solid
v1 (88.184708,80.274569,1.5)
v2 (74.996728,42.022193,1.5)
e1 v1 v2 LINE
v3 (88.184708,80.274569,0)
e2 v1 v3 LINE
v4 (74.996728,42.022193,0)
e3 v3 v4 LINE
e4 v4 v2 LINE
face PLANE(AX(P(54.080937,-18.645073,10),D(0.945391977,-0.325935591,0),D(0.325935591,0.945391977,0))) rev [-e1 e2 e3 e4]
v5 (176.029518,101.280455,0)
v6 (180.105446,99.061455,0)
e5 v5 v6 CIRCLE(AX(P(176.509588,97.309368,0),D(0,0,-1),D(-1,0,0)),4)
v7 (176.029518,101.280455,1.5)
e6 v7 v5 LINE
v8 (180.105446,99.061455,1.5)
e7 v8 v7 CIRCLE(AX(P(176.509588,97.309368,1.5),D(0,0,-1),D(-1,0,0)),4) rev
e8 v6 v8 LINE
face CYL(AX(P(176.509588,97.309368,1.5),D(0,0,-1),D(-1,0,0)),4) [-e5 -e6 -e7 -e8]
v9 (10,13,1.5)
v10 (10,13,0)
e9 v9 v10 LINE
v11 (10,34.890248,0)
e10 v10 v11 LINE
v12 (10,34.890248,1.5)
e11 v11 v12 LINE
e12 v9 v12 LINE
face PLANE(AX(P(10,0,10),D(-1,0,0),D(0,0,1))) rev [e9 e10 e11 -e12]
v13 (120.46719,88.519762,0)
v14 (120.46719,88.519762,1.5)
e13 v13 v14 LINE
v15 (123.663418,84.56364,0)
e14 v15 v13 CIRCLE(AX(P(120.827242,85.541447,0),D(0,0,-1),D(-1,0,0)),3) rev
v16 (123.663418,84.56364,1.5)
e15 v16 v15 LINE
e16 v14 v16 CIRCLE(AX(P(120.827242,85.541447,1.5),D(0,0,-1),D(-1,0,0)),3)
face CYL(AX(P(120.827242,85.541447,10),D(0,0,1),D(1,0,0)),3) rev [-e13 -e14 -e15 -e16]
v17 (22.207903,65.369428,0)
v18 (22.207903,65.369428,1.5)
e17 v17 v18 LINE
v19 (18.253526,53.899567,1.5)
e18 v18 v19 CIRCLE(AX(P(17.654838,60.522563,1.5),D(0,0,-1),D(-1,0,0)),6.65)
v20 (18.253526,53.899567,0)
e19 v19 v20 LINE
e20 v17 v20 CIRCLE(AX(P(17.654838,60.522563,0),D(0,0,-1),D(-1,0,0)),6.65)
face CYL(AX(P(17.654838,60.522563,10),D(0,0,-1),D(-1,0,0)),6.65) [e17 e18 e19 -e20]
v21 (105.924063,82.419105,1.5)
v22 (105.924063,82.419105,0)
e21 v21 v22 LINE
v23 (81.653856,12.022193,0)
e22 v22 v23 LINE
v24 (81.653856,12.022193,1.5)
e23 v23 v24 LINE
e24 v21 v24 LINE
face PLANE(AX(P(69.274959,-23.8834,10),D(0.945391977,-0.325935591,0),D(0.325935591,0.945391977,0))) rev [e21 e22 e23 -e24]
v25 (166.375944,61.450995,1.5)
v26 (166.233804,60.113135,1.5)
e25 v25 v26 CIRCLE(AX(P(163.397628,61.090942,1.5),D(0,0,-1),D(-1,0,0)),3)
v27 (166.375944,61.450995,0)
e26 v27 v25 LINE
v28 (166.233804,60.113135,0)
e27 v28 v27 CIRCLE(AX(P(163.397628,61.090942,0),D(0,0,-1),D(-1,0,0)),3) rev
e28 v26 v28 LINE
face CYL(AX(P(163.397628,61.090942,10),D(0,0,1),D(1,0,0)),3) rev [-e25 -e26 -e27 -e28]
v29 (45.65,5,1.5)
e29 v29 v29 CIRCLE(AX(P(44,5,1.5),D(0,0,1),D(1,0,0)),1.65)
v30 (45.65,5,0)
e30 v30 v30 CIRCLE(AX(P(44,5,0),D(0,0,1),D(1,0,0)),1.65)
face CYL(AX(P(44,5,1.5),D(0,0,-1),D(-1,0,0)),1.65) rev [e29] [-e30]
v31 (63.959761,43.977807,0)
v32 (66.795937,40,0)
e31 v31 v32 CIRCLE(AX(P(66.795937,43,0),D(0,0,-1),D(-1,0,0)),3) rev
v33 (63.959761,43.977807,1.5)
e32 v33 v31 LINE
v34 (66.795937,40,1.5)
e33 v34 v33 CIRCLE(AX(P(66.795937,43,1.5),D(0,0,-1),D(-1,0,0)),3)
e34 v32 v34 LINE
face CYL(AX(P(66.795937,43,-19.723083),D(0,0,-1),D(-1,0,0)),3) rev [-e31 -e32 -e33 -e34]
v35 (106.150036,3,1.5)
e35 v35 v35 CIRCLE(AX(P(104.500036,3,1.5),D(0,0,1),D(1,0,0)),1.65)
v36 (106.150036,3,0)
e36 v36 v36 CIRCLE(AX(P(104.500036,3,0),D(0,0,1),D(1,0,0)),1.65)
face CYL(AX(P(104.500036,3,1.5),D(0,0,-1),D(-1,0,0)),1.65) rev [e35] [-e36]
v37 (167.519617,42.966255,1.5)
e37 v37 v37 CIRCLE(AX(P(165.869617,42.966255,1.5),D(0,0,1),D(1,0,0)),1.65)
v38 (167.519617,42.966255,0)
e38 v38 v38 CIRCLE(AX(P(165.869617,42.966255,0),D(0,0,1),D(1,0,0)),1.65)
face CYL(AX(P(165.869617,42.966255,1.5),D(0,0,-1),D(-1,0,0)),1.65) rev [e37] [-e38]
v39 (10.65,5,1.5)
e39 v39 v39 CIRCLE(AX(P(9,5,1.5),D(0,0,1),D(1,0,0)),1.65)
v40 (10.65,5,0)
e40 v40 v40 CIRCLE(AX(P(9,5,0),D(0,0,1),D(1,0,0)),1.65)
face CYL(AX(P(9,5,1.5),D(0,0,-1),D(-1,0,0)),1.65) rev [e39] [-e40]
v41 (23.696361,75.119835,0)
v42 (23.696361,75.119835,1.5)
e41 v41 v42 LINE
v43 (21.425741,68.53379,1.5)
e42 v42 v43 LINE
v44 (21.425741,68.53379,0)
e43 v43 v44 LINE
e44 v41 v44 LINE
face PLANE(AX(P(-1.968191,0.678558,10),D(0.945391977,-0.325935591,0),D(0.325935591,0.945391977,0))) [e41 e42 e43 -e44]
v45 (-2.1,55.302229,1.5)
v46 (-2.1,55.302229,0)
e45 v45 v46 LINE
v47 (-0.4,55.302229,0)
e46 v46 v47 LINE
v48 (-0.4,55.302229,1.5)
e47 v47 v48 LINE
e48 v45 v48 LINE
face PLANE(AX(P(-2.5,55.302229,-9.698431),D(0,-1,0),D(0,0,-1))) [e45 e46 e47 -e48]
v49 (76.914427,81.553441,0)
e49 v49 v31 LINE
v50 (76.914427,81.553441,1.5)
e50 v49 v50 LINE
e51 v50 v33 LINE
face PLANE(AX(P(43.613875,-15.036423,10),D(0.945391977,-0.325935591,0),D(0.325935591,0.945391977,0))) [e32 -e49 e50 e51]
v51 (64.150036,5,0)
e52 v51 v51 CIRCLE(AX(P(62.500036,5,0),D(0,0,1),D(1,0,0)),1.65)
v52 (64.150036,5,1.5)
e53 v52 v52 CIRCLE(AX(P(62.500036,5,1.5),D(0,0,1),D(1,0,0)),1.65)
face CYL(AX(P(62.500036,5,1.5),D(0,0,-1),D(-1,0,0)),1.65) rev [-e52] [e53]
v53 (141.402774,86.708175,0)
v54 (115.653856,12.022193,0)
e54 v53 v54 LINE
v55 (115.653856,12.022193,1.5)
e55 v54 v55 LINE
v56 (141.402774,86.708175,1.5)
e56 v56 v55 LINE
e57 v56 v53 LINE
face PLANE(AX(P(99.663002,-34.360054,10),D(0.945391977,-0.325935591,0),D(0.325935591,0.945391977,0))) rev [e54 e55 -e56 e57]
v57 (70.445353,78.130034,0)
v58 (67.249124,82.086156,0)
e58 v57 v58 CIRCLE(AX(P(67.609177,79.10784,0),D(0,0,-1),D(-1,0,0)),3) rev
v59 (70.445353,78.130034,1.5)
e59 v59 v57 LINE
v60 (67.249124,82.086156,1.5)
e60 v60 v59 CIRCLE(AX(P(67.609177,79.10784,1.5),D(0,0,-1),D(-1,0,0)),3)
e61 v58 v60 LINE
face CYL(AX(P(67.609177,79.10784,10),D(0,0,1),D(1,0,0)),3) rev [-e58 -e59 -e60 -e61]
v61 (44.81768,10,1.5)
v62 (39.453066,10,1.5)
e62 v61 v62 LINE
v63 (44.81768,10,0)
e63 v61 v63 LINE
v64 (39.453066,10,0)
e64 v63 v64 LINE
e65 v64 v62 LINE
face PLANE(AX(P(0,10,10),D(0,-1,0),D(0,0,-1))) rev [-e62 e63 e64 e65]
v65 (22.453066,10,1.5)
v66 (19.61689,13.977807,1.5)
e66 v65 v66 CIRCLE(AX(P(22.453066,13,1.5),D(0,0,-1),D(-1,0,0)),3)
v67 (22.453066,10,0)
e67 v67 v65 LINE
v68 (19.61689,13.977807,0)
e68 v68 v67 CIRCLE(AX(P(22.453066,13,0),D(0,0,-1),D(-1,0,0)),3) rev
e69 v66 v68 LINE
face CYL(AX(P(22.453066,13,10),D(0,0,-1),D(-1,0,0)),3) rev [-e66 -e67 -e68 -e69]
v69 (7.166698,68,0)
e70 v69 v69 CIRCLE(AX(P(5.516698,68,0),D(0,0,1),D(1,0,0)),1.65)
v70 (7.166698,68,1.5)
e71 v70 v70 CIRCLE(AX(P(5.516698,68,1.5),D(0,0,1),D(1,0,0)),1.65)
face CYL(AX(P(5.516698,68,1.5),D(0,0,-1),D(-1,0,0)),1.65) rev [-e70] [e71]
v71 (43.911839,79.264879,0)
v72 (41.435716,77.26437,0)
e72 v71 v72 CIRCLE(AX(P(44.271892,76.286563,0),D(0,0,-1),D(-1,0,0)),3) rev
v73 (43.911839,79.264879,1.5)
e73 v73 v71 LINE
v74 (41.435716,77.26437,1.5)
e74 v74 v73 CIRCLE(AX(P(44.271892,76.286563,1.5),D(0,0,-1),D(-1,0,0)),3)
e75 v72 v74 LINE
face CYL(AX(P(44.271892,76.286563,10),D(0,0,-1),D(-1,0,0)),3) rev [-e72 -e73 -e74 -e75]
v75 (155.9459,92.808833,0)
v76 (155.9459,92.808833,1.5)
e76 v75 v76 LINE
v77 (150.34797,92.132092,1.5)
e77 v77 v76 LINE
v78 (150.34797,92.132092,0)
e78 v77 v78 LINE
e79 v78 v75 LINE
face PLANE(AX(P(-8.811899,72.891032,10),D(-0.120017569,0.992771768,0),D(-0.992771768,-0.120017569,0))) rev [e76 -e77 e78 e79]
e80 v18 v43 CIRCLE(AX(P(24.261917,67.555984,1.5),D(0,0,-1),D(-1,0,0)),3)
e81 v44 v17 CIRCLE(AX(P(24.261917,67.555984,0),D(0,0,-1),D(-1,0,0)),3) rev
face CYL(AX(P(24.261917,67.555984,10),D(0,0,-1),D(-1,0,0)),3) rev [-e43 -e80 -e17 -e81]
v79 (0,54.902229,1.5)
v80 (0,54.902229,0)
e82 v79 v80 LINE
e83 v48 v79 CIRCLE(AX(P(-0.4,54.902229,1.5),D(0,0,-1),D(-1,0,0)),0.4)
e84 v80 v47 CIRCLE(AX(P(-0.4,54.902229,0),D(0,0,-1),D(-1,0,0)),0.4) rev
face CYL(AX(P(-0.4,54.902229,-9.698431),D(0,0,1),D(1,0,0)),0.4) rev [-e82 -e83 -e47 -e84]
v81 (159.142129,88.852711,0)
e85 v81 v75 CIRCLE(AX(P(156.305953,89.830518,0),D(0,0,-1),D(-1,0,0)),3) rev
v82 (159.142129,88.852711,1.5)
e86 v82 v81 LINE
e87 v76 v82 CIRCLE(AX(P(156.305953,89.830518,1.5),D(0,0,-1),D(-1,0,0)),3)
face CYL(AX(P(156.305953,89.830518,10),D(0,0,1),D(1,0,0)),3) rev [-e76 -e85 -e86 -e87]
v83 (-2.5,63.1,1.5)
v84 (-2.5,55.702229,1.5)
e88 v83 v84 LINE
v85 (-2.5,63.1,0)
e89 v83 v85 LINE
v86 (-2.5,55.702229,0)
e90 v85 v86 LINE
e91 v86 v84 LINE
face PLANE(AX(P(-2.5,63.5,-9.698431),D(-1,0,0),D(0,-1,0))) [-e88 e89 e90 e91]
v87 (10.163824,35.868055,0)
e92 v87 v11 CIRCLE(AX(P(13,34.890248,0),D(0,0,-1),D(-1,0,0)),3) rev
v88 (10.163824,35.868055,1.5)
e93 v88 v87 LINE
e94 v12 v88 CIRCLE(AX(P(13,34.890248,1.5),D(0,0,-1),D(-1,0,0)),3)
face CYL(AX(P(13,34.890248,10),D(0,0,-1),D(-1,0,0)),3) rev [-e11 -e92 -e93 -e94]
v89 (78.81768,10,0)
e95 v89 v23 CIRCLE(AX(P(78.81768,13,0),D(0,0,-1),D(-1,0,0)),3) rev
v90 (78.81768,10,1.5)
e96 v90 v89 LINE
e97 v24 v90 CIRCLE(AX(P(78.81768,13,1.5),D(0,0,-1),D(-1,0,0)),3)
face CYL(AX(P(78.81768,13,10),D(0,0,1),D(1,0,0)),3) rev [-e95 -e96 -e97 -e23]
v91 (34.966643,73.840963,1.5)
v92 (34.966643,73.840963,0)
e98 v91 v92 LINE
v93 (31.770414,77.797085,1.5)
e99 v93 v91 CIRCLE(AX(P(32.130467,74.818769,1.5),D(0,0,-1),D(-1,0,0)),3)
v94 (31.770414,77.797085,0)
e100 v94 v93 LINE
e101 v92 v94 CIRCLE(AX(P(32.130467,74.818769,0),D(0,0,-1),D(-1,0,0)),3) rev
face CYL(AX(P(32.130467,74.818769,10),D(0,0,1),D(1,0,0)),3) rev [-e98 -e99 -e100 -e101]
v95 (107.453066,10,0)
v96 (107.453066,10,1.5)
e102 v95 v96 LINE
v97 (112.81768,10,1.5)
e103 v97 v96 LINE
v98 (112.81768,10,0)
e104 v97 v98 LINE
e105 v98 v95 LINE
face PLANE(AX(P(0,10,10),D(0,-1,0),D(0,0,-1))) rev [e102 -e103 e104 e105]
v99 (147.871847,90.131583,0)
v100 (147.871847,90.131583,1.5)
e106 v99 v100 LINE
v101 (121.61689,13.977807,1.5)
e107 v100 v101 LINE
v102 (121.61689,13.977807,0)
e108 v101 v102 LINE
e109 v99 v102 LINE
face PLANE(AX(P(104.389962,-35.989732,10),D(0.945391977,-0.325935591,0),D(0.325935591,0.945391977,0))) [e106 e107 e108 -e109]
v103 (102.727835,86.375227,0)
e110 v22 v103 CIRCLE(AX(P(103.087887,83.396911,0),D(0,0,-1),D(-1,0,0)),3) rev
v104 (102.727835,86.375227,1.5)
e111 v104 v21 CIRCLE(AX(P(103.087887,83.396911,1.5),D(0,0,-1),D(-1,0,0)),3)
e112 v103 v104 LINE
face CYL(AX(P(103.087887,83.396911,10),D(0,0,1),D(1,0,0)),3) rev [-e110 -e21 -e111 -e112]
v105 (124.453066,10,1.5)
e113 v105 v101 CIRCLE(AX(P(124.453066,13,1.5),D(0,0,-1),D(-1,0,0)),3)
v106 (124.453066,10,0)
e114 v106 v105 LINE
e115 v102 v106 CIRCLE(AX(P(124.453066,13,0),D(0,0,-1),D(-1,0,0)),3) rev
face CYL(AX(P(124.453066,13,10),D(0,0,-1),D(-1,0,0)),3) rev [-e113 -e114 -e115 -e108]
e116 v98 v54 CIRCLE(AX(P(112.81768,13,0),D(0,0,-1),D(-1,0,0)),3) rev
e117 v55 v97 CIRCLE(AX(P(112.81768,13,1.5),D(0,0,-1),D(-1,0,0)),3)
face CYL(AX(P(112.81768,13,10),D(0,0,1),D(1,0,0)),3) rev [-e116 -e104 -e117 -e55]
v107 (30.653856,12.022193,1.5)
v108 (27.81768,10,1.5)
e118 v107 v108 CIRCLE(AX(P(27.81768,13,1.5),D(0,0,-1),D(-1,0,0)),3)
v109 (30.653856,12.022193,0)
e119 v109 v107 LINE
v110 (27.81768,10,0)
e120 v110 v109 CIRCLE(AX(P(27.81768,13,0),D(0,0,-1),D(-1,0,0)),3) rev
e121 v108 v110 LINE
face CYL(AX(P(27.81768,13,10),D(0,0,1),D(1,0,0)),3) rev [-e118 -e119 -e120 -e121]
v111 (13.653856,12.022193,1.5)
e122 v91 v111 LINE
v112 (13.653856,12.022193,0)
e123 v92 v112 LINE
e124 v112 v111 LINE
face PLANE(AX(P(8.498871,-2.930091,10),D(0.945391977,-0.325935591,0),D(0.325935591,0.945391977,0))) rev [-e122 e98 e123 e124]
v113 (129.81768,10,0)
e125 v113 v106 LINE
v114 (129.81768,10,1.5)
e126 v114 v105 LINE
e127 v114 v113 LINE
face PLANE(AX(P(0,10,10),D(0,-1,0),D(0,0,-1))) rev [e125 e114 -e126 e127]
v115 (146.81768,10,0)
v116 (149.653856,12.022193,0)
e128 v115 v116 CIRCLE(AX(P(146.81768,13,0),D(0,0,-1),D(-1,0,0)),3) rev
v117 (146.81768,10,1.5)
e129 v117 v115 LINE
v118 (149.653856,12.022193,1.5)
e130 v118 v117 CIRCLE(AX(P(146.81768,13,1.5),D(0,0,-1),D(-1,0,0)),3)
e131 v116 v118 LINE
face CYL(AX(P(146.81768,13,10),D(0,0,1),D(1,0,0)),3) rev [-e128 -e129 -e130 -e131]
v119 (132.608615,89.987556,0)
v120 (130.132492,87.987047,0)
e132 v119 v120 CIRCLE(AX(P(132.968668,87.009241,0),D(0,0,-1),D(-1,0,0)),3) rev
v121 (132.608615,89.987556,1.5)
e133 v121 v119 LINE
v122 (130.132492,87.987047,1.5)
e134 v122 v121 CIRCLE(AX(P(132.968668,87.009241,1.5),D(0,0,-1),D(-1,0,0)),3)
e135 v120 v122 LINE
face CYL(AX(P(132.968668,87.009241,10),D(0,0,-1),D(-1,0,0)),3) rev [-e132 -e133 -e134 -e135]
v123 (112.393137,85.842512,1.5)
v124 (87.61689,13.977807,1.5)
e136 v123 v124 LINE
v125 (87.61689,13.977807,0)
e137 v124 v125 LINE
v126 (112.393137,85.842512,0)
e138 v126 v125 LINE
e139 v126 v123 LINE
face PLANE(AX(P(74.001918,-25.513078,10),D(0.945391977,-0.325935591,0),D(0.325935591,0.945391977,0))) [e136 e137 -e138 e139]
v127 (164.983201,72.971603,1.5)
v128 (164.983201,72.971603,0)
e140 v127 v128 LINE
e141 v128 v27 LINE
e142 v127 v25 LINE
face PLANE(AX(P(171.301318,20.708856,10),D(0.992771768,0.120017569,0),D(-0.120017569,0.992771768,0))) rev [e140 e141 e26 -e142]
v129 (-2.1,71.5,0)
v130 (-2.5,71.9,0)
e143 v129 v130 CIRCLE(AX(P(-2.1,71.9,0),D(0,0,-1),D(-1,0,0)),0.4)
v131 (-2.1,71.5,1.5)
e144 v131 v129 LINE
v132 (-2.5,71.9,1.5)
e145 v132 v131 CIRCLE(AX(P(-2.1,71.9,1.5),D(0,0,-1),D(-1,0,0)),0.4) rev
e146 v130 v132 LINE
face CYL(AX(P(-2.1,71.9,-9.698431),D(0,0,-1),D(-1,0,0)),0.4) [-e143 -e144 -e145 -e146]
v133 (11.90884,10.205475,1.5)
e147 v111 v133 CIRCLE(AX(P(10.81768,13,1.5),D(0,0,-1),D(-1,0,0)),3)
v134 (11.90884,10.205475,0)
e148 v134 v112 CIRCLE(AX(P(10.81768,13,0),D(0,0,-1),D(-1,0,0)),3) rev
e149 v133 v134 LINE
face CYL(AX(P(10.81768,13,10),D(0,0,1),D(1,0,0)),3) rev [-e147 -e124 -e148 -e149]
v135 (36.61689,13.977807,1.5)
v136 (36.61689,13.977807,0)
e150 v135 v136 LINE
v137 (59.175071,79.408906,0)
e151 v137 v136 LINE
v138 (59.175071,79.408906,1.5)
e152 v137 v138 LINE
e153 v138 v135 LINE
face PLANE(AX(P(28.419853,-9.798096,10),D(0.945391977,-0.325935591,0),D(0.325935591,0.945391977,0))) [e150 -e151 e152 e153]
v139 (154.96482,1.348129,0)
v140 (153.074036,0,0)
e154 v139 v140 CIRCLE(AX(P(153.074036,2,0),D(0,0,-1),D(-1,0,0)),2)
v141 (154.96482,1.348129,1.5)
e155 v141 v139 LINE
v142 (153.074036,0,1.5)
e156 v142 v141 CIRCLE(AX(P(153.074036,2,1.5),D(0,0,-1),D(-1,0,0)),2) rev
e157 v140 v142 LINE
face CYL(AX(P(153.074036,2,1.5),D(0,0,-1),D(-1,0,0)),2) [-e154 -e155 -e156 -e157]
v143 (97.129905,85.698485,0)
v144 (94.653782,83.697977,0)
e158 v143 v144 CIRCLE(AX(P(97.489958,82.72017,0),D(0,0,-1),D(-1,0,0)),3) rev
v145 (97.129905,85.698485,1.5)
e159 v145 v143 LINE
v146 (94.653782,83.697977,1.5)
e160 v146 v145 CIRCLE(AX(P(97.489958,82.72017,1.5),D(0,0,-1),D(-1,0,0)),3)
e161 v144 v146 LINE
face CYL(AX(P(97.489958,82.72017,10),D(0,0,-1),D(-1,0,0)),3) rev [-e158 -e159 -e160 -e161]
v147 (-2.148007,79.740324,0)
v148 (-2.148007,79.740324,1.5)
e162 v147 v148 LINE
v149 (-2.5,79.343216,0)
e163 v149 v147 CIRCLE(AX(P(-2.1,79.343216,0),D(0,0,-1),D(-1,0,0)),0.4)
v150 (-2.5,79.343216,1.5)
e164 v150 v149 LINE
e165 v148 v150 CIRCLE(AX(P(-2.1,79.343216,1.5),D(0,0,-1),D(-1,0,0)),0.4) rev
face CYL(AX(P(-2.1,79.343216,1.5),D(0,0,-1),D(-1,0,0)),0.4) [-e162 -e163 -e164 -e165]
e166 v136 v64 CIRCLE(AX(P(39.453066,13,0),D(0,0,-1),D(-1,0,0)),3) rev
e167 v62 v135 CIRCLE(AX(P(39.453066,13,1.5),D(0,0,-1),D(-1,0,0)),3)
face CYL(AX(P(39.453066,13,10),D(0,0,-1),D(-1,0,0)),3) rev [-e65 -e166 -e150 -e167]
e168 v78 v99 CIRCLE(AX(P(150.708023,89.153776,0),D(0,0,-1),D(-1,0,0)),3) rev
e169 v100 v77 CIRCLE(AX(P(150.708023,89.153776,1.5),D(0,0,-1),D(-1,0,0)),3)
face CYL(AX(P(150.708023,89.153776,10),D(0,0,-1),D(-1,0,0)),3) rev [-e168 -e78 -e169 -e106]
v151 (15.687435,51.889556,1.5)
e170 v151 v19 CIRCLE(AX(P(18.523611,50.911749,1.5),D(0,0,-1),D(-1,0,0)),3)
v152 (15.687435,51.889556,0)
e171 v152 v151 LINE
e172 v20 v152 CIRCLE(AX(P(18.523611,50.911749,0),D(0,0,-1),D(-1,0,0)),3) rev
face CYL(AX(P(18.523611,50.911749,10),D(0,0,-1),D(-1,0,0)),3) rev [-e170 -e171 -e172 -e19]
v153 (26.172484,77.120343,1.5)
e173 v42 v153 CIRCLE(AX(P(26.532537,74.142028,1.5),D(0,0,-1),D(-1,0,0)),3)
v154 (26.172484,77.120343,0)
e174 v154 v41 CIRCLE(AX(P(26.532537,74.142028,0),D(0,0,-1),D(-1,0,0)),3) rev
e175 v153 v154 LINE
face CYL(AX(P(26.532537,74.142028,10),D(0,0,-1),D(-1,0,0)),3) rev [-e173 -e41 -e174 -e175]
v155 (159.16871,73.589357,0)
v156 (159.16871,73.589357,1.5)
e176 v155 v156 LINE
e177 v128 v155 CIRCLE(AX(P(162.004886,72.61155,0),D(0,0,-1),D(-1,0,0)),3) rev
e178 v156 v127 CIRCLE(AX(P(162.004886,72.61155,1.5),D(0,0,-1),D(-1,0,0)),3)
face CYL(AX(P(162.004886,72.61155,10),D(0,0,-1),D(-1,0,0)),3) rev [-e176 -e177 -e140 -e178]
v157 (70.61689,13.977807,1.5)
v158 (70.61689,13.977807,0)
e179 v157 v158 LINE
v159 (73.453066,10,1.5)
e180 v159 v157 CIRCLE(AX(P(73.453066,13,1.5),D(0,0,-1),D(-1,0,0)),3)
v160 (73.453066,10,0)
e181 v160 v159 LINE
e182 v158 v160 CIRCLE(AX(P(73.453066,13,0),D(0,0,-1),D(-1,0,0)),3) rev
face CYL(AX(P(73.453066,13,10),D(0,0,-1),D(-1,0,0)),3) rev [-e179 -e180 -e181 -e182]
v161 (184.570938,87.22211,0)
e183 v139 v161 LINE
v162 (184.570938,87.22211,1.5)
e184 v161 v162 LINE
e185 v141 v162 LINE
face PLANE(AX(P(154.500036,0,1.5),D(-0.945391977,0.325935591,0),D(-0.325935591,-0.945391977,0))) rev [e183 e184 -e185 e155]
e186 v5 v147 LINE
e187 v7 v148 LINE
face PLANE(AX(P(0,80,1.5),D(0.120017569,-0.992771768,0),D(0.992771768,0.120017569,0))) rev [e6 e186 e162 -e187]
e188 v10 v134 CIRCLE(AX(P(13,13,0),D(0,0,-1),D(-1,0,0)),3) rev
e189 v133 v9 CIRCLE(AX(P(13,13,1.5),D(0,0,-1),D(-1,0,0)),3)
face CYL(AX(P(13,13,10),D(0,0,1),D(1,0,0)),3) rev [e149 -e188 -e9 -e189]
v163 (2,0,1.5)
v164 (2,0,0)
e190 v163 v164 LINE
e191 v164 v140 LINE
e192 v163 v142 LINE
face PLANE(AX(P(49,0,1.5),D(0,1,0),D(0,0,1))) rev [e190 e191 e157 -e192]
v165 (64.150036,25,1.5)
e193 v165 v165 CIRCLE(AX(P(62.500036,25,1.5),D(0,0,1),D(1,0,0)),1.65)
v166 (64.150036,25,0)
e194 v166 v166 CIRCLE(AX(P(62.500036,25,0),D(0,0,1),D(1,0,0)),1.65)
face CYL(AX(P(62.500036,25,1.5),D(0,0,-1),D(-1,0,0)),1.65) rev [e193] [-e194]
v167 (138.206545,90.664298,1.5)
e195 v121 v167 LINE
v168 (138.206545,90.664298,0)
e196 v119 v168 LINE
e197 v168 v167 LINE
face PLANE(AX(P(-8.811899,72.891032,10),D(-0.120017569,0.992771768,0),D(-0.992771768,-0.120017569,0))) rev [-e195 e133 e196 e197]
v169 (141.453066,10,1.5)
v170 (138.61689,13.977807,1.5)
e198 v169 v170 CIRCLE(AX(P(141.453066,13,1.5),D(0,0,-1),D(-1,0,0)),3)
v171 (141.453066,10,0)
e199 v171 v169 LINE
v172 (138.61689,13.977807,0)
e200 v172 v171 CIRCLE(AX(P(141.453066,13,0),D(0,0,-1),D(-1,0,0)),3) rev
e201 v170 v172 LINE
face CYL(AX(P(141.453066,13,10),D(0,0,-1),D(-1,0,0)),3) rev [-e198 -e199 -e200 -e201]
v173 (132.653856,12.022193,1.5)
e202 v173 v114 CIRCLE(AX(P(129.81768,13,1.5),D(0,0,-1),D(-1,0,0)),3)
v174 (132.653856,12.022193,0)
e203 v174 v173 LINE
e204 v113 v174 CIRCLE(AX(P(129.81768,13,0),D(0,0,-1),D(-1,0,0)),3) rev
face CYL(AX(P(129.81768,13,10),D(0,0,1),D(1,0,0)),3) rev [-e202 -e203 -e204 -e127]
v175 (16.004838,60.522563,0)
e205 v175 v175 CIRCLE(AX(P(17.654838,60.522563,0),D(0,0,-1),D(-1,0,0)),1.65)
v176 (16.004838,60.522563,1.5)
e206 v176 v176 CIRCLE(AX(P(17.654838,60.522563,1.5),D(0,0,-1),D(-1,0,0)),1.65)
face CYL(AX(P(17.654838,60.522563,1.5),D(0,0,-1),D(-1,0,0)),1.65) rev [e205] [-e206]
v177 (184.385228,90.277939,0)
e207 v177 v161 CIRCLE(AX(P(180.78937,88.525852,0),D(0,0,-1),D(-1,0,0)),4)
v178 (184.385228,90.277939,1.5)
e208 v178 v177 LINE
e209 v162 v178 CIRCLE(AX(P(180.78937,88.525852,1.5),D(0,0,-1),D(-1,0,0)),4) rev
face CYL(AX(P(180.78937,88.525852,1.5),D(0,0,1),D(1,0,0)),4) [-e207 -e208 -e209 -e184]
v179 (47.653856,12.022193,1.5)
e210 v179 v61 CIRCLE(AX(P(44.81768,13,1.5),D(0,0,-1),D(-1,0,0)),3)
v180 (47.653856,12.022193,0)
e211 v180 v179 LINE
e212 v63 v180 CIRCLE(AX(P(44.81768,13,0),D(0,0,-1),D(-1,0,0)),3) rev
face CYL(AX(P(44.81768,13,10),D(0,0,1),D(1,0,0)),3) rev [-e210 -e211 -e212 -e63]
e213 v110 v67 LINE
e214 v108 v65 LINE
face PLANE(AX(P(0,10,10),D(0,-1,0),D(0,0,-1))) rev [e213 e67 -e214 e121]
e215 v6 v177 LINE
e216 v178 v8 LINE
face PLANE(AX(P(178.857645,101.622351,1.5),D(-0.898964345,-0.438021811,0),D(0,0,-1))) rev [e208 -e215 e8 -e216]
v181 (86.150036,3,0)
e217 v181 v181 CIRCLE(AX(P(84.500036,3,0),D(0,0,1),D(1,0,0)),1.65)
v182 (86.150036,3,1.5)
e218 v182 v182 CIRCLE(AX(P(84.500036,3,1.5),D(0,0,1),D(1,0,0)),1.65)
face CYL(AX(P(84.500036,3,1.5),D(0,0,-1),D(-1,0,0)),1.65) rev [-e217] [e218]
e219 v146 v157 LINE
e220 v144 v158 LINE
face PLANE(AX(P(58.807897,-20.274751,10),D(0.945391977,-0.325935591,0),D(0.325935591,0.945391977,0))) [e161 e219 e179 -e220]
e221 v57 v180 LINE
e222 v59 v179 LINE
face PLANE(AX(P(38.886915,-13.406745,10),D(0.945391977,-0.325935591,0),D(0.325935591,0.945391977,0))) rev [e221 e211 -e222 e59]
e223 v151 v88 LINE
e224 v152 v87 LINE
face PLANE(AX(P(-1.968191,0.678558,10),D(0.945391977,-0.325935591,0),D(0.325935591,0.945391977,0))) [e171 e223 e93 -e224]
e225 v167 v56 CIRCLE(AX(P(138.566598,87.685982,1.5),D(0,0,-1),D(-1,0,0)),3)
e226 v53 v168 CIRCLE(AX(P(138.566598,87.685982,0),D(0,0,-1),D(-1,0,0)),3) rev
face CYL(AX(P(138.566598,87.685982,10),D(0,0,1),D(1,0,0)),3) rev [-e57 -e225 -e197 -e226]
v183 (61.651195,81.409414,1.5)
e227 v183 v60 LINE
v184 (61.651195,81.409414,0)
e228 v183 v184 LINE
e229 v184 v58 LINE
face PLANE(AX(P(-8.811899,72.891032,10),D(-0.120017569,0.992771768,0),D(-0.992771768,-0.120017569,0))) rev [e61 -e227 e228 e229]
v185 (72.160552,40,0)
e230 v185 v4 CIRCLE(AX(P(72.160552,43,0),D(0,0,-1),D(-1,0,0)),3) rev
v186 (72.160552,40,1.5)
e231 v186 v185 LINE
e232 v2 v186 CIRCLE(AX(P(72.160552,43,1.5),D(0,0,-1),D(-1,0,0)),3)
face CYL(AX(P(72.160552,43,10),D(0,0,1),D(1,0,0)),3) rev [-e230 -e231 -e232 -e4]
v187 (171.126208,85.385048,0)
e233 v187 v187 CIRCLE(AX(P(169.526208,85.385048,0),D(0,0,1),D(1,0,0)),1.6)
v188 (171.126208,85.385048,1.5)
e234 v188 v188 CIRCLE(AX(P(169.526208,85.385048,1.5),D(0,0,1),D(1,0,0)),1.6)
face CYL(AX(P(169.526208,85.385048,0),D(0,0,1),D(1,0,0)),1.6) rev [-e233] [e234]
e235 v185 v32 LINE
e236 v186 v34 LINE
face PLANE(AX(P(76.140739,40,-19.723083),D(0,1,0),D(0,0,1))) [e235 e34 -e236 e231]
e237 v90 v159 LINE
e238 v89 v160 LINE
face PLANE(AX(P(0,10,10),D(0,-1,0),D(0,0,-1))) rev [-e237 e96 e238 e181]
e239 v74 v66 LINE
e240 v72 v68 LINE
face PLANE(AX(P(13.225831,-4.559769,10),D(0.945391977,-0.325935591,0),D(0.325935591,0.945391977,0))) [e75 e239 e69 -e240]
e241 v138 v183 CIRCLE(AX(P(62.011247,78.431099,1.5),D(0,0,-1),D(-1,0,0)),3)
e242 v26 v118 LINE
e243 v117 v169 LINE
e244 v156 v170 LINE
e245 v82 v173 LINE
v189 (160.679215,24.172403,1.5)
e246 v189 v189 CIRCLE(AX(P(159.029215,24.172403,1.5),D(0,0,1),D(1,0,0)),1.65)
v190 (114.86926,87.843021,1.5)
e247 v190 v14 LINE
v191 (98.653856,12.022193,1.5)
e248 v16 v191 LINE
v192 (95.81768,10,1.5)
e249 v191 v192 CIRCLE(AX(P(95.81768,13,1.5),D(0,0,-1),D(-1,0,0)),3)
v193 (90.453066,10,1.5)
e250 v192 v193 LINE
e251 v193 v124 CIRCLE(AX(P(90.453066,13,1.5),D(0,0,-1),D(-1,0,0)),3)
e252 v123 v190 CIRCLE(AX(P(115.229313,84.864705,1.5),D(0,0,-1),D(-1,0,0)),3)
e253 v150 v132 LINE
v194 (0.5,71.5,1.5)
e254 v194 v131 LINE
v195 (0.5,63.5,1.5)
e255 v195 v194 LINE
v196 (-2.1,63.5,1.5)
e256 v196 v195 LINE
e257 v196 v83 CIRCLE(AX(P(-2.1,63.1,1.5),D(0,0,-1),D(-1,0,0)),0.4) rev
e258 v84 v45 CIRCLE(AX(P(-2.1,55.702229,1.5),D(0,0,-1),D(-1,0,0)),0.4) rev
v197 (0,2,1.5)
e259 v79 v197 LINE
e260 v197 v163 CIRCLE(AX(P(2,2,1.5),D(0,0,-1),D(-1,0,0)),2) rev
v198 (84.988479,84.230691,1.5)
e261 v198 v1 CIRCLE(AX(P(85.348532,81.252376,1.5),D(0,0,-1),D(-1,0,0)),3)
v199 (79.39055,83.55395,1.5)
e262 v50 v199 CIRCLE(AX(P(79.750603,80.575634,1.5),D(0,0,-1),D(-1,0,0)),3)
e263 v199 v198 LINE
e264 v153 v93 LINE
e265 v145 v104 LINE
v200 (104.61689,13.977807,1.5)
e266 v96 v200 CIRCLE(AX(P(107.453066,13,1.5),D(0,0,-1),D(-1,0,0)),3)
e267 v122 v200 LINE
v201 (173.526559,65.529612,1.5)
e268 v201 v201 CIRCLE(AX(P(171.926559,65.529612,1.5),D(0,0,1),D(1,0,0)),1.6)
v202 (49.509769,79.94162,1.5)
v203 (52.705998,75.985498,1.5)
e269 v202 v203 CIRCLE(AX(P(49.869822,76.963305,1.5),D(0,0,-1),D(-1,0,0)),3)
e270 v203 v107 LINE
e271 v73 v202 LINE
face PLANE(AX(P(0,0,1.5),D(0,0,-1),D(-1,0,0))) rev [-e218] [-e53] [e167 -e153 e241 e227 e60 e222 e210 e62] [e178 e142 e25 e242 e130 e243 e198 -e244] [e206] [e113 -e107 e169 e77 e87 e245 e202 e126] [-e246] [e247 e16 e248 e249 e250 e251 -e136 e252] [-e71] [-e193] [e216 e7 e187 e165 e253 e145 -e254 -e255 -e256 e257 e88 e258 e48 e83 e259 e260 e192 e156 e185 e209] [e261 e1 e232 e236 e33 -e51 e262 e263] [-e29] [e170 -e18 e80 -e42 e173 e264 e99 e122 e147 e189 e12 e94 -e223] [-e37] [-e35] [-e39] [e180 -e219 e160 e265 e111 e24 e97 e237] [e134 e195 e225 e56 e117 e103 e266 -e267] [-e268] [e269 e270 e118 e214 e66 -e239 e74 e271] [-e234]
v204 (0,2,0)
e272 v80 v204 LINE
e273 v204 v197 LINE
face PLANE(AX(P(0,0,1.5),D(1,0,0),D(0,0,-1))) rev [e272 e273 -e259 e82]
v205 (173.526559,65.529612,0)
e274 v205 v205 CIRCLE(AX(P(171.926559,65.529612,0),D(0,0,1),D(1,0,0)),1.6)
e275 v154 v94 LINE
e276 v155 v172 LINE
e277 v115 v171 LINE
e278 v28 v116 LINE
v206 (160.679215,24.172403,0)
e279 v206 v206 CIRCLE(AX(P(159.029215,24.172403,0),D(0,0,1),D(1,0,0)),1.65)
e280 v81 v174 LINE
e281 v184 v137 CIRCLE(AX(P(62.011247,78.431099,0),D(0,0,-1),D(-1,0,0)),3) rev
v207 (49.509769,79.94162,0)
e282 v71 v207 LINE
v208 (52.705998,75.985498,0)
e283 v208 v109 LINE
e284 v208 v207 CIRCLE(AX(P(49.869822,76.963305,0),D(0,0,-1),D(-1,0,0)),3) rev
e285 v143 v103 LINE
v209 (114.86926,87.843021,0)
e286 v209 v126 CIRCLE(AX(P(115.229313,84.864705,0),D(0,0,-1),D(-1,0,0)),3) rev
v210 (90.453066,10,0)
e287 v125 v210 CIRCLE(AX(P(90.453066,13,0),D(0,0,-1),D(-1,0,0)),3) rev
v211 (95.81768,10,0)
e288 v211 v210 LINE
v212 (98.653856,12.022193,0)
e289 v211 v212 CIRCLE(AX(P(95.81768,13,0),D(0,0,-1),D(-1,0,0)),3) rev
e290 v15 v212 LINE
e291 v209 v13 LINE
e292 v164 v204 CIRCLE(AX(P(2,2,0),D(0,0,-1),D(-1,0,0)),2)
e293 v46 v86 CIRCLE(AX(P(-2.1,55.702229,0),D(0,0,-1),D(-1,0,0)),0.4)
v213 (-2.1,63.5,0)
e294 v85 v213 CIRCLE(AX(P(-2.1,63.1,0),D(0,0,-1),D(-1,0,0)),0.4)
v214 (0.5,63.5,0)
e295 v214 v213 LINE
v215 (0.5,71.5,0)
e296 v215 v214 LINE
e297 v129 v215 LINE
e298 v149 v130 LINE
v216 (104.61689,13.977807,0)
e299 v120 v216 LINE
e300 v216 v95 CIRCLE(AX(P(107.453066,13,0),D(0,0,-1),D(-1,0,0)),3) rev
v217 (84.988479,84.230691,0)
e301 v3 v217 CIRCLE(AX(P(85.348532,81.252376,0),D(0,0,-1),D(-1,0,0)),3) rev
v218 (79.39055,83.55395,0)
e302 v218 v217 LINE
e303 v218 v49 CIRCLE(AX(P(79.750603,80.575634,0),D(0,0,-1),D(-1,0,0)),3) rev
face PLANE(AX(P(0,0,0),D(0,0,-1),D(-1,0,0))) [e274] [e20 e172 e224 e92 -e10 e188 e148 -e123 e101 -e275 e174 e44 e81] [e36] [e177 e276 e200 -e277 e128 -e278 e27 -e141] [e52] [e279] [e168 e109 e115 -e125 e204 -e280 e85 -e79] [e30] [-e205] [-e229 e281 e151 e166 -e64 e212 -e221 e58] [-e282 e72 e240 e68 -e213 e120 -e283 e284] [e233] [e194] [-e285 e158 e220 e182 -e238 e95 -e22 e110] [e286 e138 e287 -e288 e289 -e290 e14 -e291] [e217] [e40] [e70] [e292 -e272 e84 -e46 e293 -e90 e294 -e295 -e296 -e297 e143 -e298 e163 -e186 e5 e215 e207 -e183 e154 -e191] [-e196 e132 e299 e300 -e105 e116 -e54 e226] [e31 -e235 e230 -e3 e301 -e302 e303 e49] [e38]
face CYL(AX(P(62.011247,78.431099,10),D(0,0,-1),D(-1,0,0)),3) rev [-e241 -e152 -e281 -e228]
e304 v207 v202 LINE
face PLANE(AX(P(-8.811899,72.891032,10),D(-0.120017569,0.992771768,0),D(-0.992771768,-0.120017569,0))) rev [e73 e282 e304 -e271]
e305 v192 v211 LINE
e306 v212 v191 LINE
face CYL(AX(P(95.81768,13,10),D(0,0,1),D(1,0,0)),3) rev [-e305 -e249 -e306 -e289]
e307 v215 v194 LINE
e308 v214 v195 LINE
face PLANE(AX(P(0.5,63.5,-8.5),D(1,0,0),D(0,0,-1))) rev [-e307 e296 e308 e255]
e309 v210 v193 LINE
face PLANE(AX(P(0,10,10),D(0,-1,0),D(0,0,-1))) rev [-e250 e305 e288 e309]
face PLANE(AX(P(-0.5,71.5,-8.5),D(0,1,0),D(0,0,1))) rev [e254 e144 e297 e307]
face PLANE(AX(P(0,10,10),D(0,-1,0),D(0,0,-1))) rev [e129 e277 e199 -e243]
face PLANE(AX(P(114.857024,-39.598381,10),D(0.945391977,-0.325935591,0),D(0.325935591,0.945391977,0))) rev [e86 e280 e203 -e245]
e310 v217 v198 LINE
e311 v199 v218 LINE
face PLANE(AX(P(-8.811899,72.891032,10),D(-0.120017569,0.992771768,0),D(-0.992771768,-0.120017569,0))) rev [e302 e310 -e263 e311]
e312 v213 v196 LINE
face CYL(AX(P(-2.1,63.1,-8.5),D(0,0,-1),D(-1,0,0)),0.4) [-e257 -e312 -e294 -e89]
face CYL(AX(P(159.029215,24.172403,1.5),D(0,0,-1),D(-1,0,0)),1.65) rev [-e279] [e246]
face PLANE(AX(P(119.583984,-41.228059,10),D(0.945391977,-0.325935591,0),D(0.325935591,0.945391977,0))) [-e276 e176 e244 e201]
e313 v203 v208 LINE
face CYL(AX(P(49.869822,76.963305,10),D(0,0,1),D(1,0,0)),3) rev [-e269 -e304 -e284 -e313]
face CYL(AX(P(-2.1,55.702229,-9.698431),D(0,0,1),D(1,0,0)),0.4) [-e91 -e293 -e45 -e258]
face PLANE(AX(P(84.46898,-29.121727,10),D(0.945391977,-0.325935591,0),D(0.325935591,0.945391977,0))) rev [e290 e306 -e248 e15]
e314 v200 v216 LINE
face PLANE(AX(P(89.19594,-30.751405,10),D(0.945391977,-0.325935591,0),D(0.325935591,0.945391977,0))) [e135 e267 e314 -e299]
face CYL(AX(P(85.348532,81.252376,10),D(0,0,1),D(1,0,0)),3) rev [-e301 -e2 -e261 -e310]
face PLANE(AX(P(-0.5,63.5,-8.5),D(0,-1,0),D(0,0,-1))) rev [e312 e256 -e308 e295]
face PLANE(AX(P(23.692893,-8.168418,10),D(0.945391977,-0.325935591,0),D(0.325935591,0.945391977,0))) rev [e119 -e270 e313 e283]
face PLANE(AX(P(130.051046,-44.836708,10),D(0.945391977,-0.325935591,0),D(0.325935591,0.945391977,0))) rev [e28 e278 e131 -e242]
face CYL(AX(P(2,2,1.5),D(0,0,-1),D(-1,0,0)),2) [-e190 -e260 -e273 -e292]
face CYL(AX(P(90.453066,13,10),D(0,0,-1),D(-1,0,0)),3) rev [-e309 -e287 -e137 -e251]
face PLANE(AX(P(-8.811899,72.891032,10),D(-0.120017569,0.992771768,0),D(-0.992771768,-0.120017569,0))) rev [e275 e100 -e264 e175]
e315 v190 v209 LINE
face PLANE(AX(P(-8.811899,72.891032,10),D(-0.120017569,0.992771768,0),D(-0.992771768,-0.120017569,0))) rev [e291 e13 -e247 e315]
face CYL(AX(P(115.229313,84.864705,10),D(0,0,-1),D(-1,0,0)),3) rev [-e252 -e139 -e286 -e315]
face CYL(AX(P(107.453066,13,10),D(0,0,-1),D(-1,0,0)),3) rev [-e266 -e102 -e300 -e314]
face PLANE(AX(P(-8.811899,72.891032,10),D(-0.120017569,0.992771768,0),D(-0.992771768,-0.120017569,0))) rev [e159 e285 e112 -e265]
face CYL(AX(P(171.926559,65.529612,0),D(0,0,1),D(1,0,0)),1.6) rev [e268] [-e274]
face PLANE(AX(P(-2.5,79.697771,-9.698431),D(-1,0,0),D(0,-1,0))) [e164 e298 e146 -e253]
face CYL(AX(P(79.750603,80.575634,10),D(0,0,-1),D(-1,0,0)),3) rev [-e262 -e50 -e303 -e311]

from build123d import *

# Parameters (mm, degrees)
SKETCH_1_R          = 1.65
EXTRUDE_1_DEPTH     = 1.5
SKETCH_2_R          = 1.65
CUT_EXTRUDE_1_DEPTH = 217.113258134
SKETCH_5_R          = 1.6
CUT_EXTRUDE_3_DEPTH = 217.113258134
CUT_EXTRUDE_4_DEPTH = 10
FILLET_3_R          = 3
FILLET_4_R          = 5
SKETCH_7_W          = 17
SKETCH_7_H          = 10
EXTRUDE_2_DEPTH     = 1.5
FILLET_5_R          = 3
FILLET_7_R          = 2
CHAMFER_1_SIZE      = 15
CHAMFER_1_SIZE2     = 11.223480876
FILLET_8_R          = 4
SKETCH_9_W          = 1
SKETCH_9_H          = 8
CUT_EXTRUDE_5_DEPTH = 10
SKETCH_10_W         = 2.5
SKETCH_10_H         = 8.1977715
EXTRUDE_3_DEPTH     = 1.5
FILLET_9_R          = 0.4


with BuildPart() as part:
    # 草图1 → 凸台-拉伸1 (new body)
    with BuildSketch(Plane.XY):
        Polygon((0, 0), (49, 0), (154.500036, 0), (190, 102.969366032), (0, 80), align=None)
        with Locations((44, 5)):
            Circle(SKETCH_1_R, mode=Mode.SUBTRACT)
        with Locations((9, 5)):
            Circle(SKETCH_1_R, mode=Mode.SUBTRACT)
        with Locations((62.500036, 5)):
            Circle(SKETCH_1_R, mode=Mode.SUBTRACT)
        with Locations((62.500036, 25)):
            Circle(SKETCH_1_R, mode=Mode.SUBTRACT)
        with Locations((84.500036, 3)):
            Circle(SKETCH_1_R, mode=Mode.SUBTRACT)
        with Locations((104.500036, 3)):
            Circle(SKETCH_1_R, mode=Mode.SUBTRACT)
        with Locations((159.029214579, 24.172402674)):
            Circle(SKETCH_1_R, mode=Mode.SUBTRACT)
        with Locations((165.869617446, 42.96625509)):
            Circle(SKETCH_1_R, mode=Mode.SUBTRACT)
        with Locations((5.51669804, 68)):
            Circle(SKETCH_1_R, mode=Mode.SUBTRACT)
    extrude(amount=EXTRUDE_1_DEPTH)

    # 草图2 → 切除-拉伸1 (cut, through all)
    with BuildSketch(Plane(origin=(0, 0, 0), x_dir=(-1, 0, 0), z_dir=(0, 0, -1))):
        with Locations((-17.654838092, 60.522562577)):
            Circle(SKETCH_2_R)
    extrude(amount=-CUT_EXTRUDE_1_DEPTH, mode=Mode.SUBTRACT)

    # 草图5 → 切除-拉伸3 (cut, through all)
    with BuildSketch(Plane.XY.offset(1.5)):
        with Locations((169.526207601, 85.385047705)):
            Circle(SKETCH_5_R)
        with Locations((171.926558982, 65.529612347)):
            Circle(SKETCH_5_R)
    extrude(amount=-CUT_EXTRUDE_3_DEPTH, mode=Mode.SUBTRACT)

    # 草图6 → 切除-拉伸4 (cut)
    with BuildSketch(Plane(origin=(0, 0, 0), x_dir=(-1, 0, 0), z_dir=(0, 0, -1))):
        Polygon((-166.458788313, 60.765712768), (-148.956680209, 10), (-137.24549175, 10), (-163.418370686, 85.91570378), align=None)
        Polygon((-160.704378524, 93.384092174), (-131.956680209, 10), (-120.24549175, 10), (-148.483853144, 91.90673575), align=None)
        Polygon((-142.96502336, 91.23955669), (-114.956680209, 10), (-103.24549175, 10), (-130.74449798, 89.762200266), align=None)
        Polygon((-125.225668197, 89.095021206), (-97.956680209, 10), (-86.24549175, 10), (-113.005142817, 87.617664782), align=None)
        Polygon((-107.486313033, 86.950485723), (-80.956680209, 10), (-69.24549175, 10), (-95.265787653, 85.473129299), align=None)
        with BuildLine():
            Line((-77.526432489, 83.328593815), (-89.746957869, 84.805950239))
            Line((-89.746957869, 84.805950239), (-69.149740199, 25.062722173))
            ThreePointArc((-69.149740199, 25.062722173), (-65.935444688, 30.69389736), (-59.455145067, 30.91194885))
            Line((-59.455145067, 30.91194885), (-77.526432489, 83.328593815))
        make_face()
        with BuildLine():
            Line((-12.956680209, 10), (-10, 10))
            Line((-10, 10), (-10, 35.392875452))
            Line((-10, 35.392875452), (-16.411528112, 53.989823466))
            ThreePointArc((-16.411528112, 53.989823466), (-23.94169474, 58.355090898), (-20.701647581, 66.4335229))
            Line((-20.701647581, 66.4335229), (-24.308366998, 76.894987363))
            Line((-24.308366998, 76.894987363), (-36.528892378, 78.372343787))
            Line((-36.528892378, 78.372343787), (-12.956680209, 10))
        make_face()
        Polygon((-72.007602706, 82.661414755), (-46.956680209, 10), (-35.24549175, 10), (-59.787077326, 81.184058331), align=None)
        Polygon((-29.956680209, 10), (-18.24549175, 10), (-42.047722162, 79.039522847), (-54.268247542, 80.516879271), align=None)
    extrude(amount=-CUT_EXTRUDE_4_DEPTH, mode=Mode.SUBTRACT)

    # 圆角3
    # the kernel refuses this fillet: 3 mm, written as the material it adds along each edge
    with BuildSketch(Plane(origin=(89.746957869, 84.805950239, 0), x_dir=(-0.32593559085415924, -0.9453919772319576, 0), z_dir=(0, 0, 1)), Plane(origin=(107.486313033, 86.950485723, 0), x_dir=(-0.32593559085416013, -0.9453919772319572, 0), z_dir=(0, 0, 1)), Plane(origin=(54.268247542, 80.516879271, 0), x_dir=(-0.32593559085415885, -0.9453919772319577, 0), z_dir=(0, 0, 1)), Plane(origin=(125.225668197, 89.095021206, 0), x_dir=(-0.32593559085416013, -0.9453919772319572, 0), z_dir=(0, 0, 1)), Plane(origin=(142.96502336, 91.23955669, 0), x_dir=(-0.3259355908541637, -0.945391977231956, 0), z_dir=(0, 0, 1)), Plane(origin=(36.528892378, 78.372343787, 0), x_dir=(-0.32593559085416013, -0.9453919772319572, 0), z_dir=(0, 0, 1))) as fillet_3_piece_1:
        with BuildLine():
            CenterArc((FILLET_3_R * 1.59770807733, -FILLET_3_R), FILLET_3_R, 90, 115.915383649)
            Line((FILLET_3_R * 0.698267610033, -FILLET_3_R * 1.43704329967), (0, 0))
            Line((0, 0), (FILLET_3_R * 1.59770807733, 0))
        make_face()
    extrude(amount=1.5)
    with BuildSketch(Plane(origin=(77.526432489, 83.328593815, 0), x_dir=(-0.32593559085416024, -0.9453919772319572, 0), z_dir=(0, 0, 1))) as fillet_3_piece_2:
        with BuildLine():
            CenterArc((FILLET_3_R * 0.625896566582, FILLET_3_R), FILLET_3_R, 205.915383649, 64.084616351)
            Line((-FILLET_3_R * 0.273543900714, FILLET_3_R * 0.562956700325), (0, 0))
            Line((0, 0), (FILLET_3_R * 0.625896566582, 0))
        make_face()
    extrude(amount=1.5)
    with BuildSketch(Plane(origin=(95.265787653, 85.473129299, 0), x_dir=(0.9927717678876198, 0.12001756906924078, 0), z_dir=(0, 0, 1)), Plane(origin=(42.047722162, 79.039522847, 0), x_dir=(0.9927717678876197, 0.12001756906924214, 0), z_dir=(0, 0, 1)), Plane(origin=(59.787077326, 81.184058331, 0), x_dir=(0.9927717678876204, 0.12001756906923514, 0), z_dir=(0, 0, 1)), Plane(origin=(148.483853144, 91.90673575, 0), x_dir=(0.9927717678876198, 0.12001756906924078, 0), z_dir=(0, 0, 1)), Plane(origin=(113.005142817, 87.617664782, 0), x_dir=(0.9927717678876197, 0.12001756906924169, 0), z_dir=(0, 0, 1)), Plane(origin=(130.74449798, 89.762200266, 0), x_dir=(0.9927717678876193, 0.1200175690692444, 0), z_dir=(0, 0, 1)), Plane(origin=(24.308366998, 76.894987363, 0), x_dir=(0.9927717678876197, 0.12001756906924214, 0), z_dir=(0, 0, 1))) as fillet_3_piece_3:
        with BuildLine():
            CenterArc((FILLET_3_R * 0.625896566582, -FILLET_3_R), FILLET_3_R, 90, 64.084616351)
            Line((-FILLET_3_R * 0.273543900714, -FILLET_3_R * 0.562956700325), (0, 0))
            Line((0, 0), (FILLET_3_R * 0.625896566582, 0))
        make_face()
    extrude(amount=1.5)
    with BuildSketch(Plane(origin=(69.24549175, 10, 0), x_dir=(0.3259355908541607, 0.9453919772319569, 0), z_dir=(0, 0, 1)), Plane(origin=(35.24549175, 10, 0), x_dir=(0.3259355908541611, 0.9453919772319569, 0), z_dir=(0, 0, 1)), Plane(origin=(120.24549175, 10, 0), x_dir=(0.3259355908541582, 0.9453919772319579, 0), z_dir=(0, 0, 1)), Plane(origin=(137.24549175, 10, 0), x_dir=(0.3259355908541602, 0.9453919772319572, 0), z_dir=(0, 0, 1)), Plane(origin=(86.24549175, 10, 0), x_dir=(0.3259355908541607, 0.9453919772319569, 0), z_dir=(0, 0, 1)), Plane(origin=(103.24549175, 10, 0), x_dir=(0.3259355908541607, 0.9453919772319569, 0), z_dir=(0, 0, 1))) as fillet_3_piece_4:
        with BuildLine():
            CenterArc((FILLET_3_R * 1.40252469112, -FILLET_3_R), FILLET_3_R, 90, 109.022267108)
            Line((FILLET_3_R * 0.457132713888, -FILLET_3_R * 1.32593559085), (0, 0))
            Line((0, 0), (FILLET_3_R * 1.40252469112, 0))
        make_face()
    extrude(amount=1.5)
    with BuildSketch(Plane(origin=(80.956680209, 10, 0), x_dir=(0.32593559085415746, 0.9453919772319582, 0), z_dir=(0, 0, 1)), Plane(origin=(97.956680209, 10, 0), x_dir=(0.32593559085415946, 0.9453919772319574, 0), z_dir=(0, 0, 1)), Plane(origin=(114.956680209, 10, 0), x_dir=(0.3259355908541564, 0.9453919772319586, 0), z_dir=(0, 0, 1)), Plane(origin=(12.956680209, 10, 0), x_dir=(0.3259355908541589, 0.9453919772319578, 0), z_dir=(0, 0, 1))) as fillet_3_piece_5:
        with BuildLine():
            CenterArc((FILLET_3_R * 0.7129999253, FILLET_3_R), FILLET_3_R, 199.022267108, 70.977732892)
            Line((-FILLET_3_R * 0.232392051932, FILLET_3_R * 0.674064409146), (0, 0))
            Line((0, 0), (FILLET_3_R * 0.7129999253, 0))
        make_face()
    extrude(amount=1.5)
    with BuildSketch(Plane(origin=(18.24549175, 10, 0), x_dir=(1, 0, 0), z_dir=(0, 0, 1))) as fillet_3_piece_6:
        with BuildLine():
            CenterArc((FILLET_3_R * 1.40252469112, FILLET_3_R), FILLET_3_R, 160.977732892, 109.022267108)
            Line((FILLET_3_R * 0.457132713888, FILLET_3_R * 1.32593559085), (0, 0))
            Line((0, 0), (FILLET_3_R * 1.40252469112, 0))
        make_face()
    extrude(amount=1.5)
    with BuildSketch(Plane(origin=(29.956680209, 10, 0), x_dir=(-1, 0, 0), z_dir=(0, 0, 1)), Plane(origin=(46.956680209, 10, 0), x_dir=(-1, 0, 0), z_dir=(0, 0, 1)), Plane(origin=(131.956680209, 10, 0), x_dir=(-1, 0, 0), z_dir=(0, 0, 1)), Plane(origin=(148.956680209, 10, 0), x_dir=(-1, 0, 0), z_dir=(0, 0, 1))) as fillet_3_piece_7:
        with BuildLine():
            CenterArc((FILLET_3_R * 0.7129999253, -FILLET_3_R), FILLET_3_R, 90, 70.977732892)
            Line((-FILLET_3_R * 0.232392051932, -FILLET_3_R * 0.674064409146), (0, 0))
            Line((0, 0), (FILLET_3_R * 0.7129999253, 0))
        make_face()
    extrude(amount=1.5)
    with BuildSketch(Plane(origin=(72.007602706, 82.661414755, 0), x_dir=(-0.9927717678876198, -0.12001756906924071, 0), z_dir=(0, 0, 1)), Plane(origin=(160.704378524, 93.384092174, 0), x_dir=(-0.9927717678876197, -0.12001756906924108, 0), z_dir=(0, 0, 1))) as fillet_3_piece_8:
        with BuildLine():
            CenterArc((FILLET_3_R * 1.59770807733, FILLET_3_R), FILLET_3_R, 154.084616351, 115.915383649)
            Line((FILLET_3_R * 0.698267610033, FILLET_3_R * 1.43704329967), (0, 0))
            Line((0, 0), (FILLET_3_R * 1.59770807733, 0))
        make_face()
    extrude(amount=1.5)
    with BuildSketch(Plane(origin=(166.458788313, 60.765712768, 0), x_dir=(-0.3259355908541462, -0.9453919772319621, 0), z_dir=(0, 0, 1))) as fillet_3_piece_9:
        with BuildLine():
            CenterArc((FILLET_3_R * 0.230090548875, -FILLET_3_R), FILLET_3_R, 90, 25.915383649)
            Line((-FILLET_3_R * 0.2069527508, -FILLET_3_R * 0.100559532704), (0, 0))
            Line((0, 0), (FILLET_3_R * 0.230090548875, 0))
        make_face()
    extrude(amount=1.5)
    with BuildSketch(Plane(origin=(163.418370686, 85.91570378, 0), x_dir=(-0.3259355908541588, -0.9453919772319578, 0), z_dir=(0, 0, 1))) as fillet_3_piece_10:
        with BuildLine():
            CenterArc((FILLET_3_R * 4.34611506162, FILLET_3_R), FILLET_3_R, 115.915383649, 154.084616351)
            Line((FILLET_3_R * 3.90907176194, FILLET_3_R * 1.8994404673), (0, 0))
            Line((0, 0), (FILLET_3_R * 4.34611506162, 0))
        make_face()
    extrude(amount=1.5)
    with BuildSketch(Plane(origin=(20.701647581, 66.4335229, 0), x_dir=(0.3259355908541343, 0.9453919772319662, 0), z_dir=(0, 0, 1))) as fillet_3_piece_11:
        with BuildLine():
            CenterArc((2.221583802, -3), FILLET_3_R, 90, 65.812499939)
            ThreePointArc((-0.515044774, -1.770827906), (-0.195837699, -0.903354926), (0, 0))
            Line((0, 0), (2.221583802, 0))
        make_face()
    extrude(amount=1.5)
    with BuildSketch(Plane(origin=(16.411528112, 53.989823466, 0), x_dir=(0.9988016907645847, -0.04894060201720955, 0), z_dir=(0, 0, 1))) as fillet_3_piece_12:
        with BuildLine():
            CenterArc((2.260194582, -2.971019192), FILLET_3_R, 97.970443489, 65.812499939)
            Line((-0.620437185, -2.133188292), (0, 0))
            ThreePointArc((0, 0), (0.922103925, -0.064240792), (1.84420785, 0))
        make_face()
    extrude(amount=1.5)
    with BuildSketch(Plane(origin=(10, 35.392875452, 0), x_dir=(0.3259355908541632, 0.9453919772319561, 0), z_dir=(0, 0, 1))) as fillet_3_piece_13:
        with BuildLine():
            CenterArc((FILLET_3_R * 0.167542374323, -FILLET_3_R), FILLET_3_R, 90, 19.022267108)
            Line((-FILLET_3_R * 0.158393216531, -FILLET_3_R * 0.054608022768), (0, 0))
            Line((0, 0), (FILLET_3_R * 0.167542374323, 0))
        make_face()
    extrude(amount=1.5)
    with BuildSketch(Plane(origin=(10, 10, 0), x_dir=(0, 1, 0), z_dir=(0, 0, 1))) as fillet_3_piece_14:
        with BuildLine():
            CenterArc((FILLET_3_R, -FILLET_3_R), FILLET_3_R, 90, 90)
            Line((0, -FILLET_3_R), (0, 0))
            Line((0, 0), (FILLET_3_R, 0))
        make_face()
    extrude(amount=1.5)

    # 圆角4
    fillet_4_edges = [part.edges().sort_by_distance(p)[0] for p in [
        (69.149740199, 25.062722173, 0.75),
    ]]
    fillet(fillet_4_edges, radius=FILLET_4_R)

    # 草图7 → 凸台-拉伸2 (add)
    with BuildSketch(Plane.XY.offset(1.5)):
        with Locations((67.640739409, 35)):
            Rectangle(SKETCH_7_W, SKETCH_7_H)
    extrude(amount=-EXTRUDE_2_DEPTH)

    # 圆角5
    fillet_5_edges = [part.edges().sort_by_distance(p)[0] for p in [
        (62.588363238, 40, 0.75),
        (74.299551697, 40, 0.75),
    ]]
    fillet(fillet_5_edges, radius=FILLET_5_R)

    # 圆角7
    fillet_7_edges = [part.edges().sort_by_distance(p)[0] for p in [
        (0, 80, 0.75),
        (154.500036, 0, 0.75),
        (0, 0, 0.75),
    ]]
    fillet(fillet_7_edges, radius=FILLET_7_R)

    # 倒角1
    chamfer_1_edges = [part.edges().sort_by_distance(p)[0] for p in [
        (190, 102.969366032, 0.75),
    ]]
    chamfer_1_side = [part.faces().sort_by_distance(p)[0] for p in [
        (172.482410052, 52.158747425, 0.75),
    ]]
    chamfer(chamfer_1_edges, length=CHAMFER_1_SIZE, length2=CHAMFER_1_SIZE2, reference=chamfer_1_side[0])

    # 圆角8
    fillet_8_edges = [part.edges().sort_by_distance(p)[0] for p in [
        (178.857645049, 101.622351141, 0.75),
        (185.110966137, 88.788486374, 0.75),
    ]]
    fillet(fillet_8_edges, radius=FILLET_8_R)

    # 草图9 → 切除-拉伸5 (cut)
    with BuildSketch(Plane.XY.offset(1.5)):
        with Locations((0, 67.5)):
            Rectangle(SKETCH_9_W, SKETCH_9_H)
    extrude(amount=-CUT_EXTRUDE_5_DEPTH, mode=Mode.SUBTRACT)

    # 草图10 → 凸台-拉伸3 (add)
    with BuildSketch(Plane.XY.offset(1.5)):
        with BuildLine():
            Line((1.759964862, 80.212764616), (-2.5, 79.6977715))
            Line((-2.5, 79.6977715), (-2.5, 71.5))
            Line((-2.5, 71.5), (0, 71.5))
            Line((0, 71.5), (0, 78.227221081))
            ThreePointArc((0, 78.227221081), (0.503325307, 79.553857754), (1.759964862, 80.212764616))
        make_face()
        with Locations((-1.25, 59.40111425)):
            Rectangle(SKETCH_10_W, SKETCH_10_H)
    extrude(amount=-EXTRUDE_3_DEPTH)

    # 圆角9
    fillet_9_edges = [part.edges().sort_by_distance(p)[0] for p in [
        (-2.5, 79.6977715, 0.75),
        (-2.5, 71.5, 0.75),
        (-2.5, 63.5, 0.75),
        (-2.5, 55.3022285, 0.75),
        (0, 55.3022285, 0.75),
    ]]
    fillet(fillet_9_edges, radius=FILLET_9_R)


solid = part.part
